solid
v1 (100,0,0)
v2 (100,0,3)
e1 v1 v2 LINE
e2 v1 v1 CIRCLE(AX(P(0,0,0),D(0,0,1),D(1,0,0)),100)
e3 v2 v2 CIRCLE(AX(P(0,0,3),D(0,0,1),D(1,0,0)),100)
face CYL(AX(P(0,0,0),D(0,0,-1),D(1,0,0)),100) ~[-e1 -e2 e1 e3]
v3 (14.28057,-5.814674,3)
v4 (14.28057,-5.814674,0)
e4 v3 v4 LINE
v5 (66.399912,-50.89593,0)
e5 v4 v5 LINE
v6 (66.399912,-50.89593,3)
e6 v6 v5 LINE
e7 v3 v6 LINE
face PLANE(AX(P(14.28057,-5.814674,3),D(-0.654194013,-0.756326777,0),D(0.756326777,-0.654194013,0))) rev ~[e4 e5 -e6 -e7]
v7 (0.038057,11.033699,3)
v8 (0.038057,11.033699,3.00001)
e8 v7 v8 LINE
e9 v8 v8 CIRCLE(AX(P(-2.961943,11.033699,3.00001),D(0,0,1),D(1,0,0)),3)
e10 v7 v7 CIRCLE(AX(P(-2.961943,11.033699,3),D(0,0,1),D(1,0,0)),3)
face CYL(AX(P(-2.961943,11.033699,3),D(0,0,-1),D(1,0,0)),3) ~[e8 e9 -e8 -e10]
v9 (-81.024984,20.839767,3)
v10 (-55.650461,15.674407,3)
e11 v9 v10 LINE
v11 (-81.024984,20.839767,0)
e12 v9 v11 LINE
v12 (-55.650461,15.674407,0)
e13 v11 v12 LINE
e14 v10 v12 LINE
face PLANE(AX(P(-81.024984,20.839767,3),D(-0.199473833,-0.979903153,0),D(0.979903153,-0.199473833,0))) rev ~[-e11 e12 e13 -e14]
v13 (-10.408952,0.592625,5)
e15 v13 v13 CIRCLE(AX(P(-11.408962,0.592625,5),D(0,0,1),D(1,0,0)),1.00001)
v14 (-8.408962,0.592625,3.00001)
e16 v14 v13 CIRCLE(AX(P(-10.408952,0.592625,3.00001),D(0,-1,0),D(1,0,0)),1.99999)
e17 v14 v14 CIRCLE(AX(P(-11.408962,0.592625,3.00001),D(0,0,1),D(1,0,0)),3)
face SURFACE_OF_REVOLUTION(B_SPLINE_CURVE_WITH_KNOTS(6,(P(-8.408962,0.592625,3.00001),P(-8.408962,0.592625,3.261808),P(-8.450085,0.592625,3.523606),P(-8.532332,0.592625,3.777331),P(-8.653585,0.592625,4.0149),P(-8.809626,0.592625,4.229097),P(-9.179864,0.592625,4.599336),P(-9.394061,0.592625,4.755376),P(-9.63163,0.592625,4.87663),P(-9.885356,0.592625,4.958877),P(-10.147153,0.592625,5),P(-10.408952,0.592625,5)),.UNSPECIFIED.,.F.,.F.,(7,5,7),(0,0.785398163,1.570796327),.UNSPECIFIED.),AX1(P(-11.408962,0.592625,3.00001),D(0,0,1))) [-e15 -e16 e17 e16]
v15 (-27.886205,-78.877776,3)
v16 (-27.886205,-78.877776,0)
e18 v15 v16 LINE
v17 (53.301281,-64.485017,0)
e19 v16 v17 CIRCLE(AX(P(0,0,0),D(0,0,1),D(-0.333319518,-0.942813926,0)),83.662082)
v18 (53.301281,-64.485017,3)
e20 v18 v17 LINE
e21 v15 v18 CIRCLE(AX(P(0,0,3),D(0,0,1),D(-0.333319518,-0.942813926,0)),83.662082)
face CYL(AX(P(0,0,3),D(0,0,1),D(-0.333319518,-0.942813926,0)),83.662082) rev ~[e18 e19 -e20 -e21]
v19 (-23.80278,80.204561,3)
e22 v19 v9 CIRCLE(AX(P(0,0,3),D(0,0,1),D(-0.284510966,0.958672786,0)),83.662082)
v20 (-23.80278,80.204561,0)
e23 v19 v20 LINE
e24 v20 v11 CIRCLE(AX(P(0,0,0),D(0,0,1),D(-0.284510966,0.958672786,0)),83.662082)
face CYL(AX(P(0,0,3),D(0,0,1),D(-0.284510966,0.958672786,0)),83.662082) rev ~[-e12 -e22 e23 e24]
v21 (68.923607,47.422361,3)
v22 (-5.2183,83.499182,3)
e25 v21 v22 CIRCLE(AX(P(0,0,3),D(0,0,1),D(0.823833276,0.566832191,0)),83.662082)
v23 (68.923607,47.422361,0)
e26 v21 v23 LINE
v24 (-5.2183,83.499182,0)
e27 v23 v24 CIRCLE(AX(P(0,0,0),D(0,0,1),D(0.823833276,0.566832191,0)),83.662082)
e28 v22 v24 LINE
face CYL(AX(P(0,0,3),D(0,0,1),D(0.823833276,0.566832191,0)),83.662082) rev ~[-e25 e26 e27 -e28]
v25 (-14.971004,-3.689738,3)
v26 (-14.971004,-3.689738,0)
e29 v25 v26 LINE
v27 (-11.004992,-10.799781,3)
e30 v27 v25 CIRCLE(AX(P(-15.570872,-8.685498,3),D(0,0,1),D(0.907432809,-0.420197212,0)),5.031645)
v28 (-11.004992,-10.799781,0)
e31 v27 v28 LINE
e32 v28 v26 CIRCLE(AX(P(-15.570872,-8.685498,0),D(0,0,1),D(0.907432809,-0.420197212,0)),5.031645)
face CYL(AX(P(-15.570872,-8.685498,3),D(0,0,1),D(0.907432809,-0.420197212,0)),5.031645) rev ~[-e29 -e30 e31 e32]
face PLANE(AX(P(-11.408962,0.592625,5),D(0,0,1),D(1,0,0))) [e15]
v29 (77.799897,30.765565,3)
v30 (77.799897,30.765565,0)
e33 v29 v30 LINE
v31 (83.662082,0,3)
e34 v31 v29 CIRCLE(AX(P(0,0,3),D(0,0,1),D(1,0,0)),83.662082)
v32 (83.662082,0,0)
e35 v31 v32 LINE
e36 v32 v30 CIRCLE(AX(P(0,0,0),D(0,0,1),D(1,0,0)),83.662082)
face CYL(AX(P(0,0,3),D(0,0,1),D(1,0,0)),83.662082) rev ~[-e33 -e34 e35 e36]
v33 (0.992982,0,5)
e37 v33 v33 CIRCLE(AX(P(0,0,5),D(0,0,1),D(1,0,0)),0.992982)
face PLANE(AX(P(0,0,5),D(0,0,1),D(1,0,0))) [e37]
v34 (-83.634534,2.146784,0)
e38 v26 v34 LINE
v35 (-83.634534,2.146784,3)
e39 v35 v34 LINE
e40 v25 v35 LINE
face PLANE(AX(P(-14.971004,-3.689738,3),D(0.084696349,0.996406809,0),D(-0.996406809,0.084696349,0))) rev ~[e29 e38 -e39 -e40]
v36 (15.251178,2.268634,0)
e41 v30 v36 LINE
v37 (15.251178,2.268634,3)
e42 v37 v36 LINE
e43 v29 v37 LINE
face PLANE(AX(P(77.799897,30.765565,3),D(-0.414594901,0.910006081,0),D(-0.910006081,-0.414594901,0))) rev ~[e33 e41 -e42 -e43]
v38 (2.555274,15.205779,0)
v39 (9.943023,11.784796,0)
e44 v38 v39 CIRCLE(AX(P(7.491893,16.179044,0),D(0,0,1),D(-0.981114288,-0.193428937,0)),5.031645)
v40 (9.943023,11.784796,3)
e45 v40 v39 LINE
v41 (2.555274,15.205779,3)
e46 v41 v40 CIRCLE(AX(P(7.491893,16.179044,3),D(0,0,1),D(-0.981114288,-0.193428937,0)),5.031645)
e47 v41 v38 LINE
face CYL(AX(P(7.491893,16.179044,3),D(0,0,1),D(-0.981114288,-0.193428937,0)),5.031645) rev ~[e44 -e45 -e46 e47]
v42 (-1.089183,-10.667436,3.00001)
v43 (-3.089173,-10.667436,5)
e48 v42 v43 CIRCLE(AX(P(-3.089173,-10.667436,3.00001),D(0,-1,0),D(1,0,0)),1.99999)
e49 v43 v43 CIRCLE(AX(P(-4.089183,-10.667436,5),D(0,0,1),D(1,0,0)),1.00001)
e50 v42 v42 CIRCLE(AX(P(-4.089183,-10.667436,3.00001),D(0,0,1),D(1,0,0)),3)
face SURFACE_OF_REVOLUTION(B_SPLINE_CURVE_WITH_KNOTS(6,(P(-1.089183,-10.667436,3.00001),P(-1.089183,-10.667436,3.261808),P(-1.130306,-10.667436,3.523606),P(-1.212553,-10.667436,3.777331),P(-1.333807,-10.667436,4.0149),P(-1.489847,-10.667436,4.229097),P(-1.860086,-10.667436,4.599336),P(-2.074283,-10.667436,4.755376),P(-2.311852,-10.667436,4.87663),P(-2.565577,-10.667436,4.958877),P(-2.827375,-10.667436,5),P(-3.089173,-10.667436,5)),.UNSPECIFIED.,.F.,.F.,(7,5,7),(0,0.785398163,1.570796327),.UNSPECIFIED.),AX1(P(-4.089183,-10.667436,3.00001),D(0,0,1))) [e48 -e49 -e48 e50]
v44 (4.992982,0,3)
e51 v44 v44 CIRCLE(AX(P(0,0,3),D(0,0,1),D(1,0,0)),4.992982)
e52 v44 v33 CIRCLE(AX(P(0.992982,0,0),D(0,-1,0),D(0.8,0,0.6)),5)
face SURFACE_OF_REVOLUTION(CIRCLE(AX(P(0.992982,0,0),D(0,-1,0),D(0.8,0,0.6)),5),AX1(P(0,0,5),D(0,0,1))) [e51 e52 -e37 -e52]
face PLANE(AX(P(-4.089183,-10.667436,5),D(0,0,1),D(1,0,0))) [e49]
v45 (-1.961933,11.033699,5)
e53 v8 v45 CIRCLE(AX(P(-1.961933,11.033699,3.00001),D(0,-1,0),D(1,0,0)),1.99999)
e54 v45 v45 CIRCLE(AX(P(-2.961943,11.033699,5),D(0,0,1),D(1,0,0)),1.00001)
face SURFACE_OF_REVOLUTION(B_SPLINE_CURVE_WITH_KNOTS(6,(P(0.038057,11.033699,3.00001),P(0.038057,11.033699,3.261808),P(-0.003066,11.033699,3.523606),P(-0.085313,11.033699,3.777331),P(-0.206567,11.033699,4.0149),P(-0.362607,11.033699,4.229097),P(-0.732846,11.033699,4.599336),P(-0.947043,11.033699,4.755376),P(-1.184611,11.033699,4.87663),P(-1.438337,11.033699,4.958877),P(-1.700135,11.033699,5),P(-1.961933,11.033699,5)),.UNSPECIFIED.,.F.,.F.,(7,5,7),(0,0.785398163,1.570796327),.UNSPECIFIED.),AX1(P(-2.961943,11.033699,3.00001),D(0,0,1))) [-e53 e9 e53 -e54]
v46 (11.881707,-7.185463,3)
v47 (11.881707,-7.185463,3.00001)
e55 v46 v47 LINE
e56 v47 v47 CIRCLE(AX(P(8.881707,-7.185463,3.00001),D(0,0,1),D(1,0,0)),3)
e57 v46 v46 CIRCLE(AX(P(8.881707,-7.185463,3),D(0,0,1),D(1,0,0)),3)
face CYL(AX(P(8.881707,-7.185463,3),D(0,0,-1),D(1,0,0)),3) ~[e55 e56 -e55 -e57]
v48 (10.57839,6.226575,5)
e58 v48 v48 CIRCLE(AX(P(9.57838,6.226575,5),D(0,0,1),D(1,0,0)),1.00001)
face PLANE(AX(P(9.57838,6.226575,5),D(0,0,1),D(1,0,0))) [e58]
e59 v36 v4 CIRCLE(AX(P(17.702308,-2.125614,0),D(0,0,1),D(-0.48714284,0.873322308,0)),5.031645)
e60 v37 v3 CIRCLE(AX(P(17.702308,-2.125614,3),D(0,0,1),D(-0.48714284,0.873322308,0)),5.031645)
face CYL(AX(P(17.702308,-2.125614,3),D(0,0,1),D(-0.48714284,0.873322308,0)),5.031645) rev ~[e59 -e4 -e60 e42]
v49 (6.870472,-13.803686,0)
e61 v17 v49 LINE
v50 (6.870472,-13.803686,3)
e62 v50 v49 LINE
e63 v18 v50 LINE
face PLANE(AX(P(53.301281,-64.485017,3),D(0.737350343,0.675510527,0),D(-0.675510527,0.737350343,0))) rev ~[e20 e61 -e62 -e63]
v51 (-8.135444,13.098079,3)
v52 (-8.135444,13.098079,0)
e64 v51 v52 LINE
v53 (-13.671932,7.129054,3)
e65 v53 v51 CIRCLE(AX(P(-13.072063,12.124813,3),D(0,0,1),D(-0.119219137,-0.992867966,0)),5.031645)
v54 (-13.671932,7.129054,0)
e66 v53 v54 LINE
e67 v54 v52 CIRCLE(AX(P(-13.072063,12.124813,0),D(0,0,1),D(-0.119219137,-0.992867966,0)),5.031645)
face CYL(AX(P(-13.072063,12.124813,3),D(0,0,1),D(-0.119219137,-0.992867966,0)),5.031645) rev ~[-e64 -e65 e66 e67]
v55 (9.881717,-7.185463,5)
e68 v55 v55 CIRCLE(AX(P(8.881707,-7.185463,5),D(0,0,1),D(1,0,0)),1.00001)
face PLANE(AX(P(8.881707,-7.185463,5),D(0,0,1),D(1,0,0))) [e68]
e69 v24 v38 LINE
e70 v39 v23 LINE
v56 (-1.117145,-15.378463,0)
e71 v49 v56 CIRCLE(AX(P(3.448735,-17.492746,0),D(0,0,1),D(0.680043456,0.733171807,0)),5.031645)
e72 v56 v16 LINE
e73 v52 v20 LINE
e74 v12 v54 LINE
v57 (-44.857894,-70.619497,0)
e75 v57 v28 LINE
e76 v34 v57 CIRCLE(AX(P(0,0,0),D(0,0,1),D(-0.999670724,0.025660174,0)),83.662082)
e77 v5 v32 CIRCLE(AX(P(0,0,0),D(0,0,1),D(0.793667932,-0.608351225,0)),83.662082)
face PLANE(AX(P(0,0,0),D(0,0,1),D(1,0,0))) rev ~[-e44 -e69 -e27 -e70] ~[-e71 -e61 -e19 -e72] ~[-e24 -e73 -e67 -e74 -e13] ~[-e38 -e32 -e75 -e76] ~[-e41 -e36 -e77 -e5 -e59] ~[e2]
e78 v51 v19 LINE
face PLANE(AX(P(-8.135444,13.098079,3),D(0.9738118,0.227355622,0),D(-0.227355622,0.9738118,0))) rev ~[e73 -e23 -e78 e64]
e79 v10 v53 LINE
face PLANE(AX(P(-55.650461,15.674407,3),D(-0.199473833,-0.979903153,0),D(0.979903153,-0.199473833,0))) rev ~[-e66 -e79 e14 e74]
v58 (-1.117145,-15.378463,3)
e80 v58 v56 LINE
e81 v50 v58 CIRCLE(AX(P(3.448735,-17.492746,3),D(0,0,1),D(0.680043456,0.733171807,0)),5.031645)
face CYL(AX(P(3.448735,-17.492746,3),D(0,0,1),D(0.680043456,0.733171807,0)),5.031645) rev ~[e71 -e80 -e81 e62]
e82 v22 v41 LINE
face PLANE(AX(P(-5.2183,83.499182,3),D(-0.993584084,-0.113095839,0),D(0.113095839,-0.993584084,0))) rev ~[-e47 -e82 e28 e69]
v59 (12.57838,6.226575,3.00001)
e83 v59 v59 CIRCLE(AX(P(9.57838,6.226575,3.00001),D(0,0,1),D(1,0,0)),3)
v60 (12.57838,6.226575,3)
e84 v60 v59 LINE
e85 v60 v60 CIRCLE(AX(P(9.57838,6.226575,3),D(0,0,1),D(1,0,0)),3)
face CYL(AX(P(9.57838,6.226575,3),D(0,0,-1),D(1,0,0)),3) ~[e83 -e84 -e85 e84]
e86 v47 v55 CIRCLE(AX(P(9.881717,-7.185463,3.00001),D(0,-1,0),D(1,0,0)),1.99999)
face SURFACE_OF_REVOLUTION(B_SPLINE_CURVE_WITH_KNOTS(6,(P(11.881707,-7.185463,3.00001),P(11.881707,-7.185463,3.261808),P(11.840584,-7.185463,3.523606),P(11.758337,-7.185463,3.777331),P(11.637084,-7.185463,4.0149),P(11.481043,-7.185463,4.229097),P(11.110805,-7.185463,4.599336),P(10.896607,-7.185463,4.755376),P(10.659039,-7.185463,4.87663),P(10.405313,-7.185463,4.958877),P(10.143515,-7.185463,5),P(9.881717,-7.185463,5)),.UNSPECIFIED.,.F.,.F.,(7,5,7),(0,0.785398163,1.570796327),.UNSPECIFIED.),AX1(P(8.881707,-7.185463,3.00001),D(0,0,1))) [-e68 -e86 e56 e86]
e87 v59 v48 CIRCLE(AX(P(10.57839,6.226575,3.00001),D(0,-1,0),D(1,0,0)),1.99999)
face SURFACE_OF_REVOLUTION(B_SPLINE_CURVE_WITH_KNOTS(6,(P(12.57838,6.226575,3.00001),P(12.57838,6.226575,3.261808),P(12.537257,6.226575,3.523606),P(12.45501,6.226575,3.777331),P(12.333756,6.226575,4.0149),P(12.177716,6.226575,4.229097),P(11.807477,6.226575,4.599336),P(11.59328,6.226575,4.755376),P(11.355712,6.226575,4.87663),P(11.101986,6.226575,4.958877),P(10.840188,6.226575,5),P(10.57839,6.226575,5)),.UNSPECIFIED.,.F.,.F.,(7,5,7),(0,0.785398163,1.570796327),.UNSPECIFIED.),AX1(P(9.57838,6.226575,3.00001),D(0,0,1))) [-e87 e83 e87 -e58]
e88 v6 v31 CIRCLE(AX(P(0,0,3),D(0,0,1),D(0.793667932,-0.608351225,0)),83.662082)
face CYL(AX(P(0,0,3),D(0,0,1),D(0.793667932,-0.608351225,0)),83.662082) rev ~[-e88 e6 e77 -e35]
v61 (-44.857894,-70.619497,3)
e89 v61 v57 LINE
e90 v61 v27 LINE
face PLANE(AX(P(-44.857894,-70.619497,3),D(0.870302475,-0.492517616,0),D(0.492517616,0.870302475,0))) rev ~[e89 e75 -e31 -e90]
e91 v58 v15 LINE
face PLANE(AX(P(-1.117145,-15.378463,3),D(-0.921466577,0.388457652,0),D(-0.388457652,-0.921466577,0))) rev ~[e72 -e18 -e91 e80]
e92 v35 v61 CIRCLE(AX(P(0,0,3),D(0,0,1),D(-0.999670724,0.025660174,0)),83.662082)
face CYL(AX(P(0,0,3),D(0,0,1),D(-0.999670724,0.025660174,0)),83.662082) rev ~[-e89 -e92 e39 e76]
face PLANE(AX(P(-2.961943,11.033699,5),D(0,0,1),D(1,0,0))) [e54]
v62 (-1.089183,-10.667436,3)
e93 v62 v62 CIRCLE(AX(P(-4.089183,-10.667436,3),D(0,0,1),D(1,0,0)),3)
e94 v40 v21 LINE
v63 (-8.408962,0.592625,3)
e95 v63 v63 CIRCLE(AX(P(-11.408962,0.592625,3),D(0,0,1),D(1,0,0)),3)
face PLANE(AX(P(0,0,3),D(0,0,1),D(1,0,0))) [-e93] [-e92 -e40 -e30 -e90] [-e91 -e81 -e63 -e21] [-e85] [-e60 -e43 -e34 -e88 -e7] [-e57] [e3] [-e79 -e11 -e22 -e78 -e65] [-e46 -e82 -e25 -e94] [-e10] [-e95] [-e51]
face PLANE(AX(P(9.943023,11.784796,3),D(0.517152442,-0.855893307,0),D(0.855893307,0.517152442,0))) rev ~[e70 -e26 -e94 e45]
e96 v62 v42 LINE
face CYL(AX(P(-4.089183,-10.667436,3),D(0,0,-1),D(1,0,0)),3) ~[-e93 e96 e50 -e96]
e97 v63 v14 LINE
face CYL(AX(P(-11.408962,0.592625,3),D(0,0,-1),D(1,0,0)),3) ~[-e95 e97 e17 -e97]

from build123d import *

# Parameters (mm, degrees)
F0_R     = 100
F1_DEPTH = 3
F2_R     = 3
F3_DEPTH = 2
F4_R     = 4.9929816157
F5_DEPTH = 2
F6_R     = 1.99999
F9_DEPTH = 3


# Not quite as in the source:
# - a fillet or chamfer that OpenCascade refuses, or shapes differently, is made with other operations: its cross-section is extruded or revolved along the edge and cut away or added
# - a fillet or chamfer is up to 0.001 mm smaller than in the source, because OpenCascade refuses the exact size


with BuildPart() as f1:
    # F0 (on Top) → F1 (new body)
    with BuildSketch(Plane.XY):
        Circle(F0_R)
    extrude(amount=F1_DEPTH)

    # F2 (on face) → F3 (join)
    with BuildSketch(Plane.XY.offset(3)):
        with Locations((-2.9619428524, 11.0336985157)):
            Circle(F2_R)
        with Locations((9.5783801944, 6.2265754028)):
            Circle(F2_R)
        with Locations((-11.4089615499, 0.5926253015)):
            Circle(F2_R)
        with Locations((-4.0891831618, -10.6674359368)):
            Circle(F2_R)
        with Locations((8.8817073697, -7.1854632832)):
            Circle(F2_R)
    extrude(amount=F3_DEPTH)

    # F4 (on face) → F5 (join)
    with BuildSketch(Plane.XY.offset(3)):
        Circle(F4_R)
    extrude(amount=F5_DEPTH)

    # F6 (radius 2 in the source; OpenCascade refuses exactly that, so slightly less here)
    f6_edges = [f1.edges().sort_by_distance(p)[0] for p in [
        (-5.961943, 11.033699, 5),
        (6.57838, 6.226575, 5),
        (-14.408962, 0.592625, 5),
        (-7.089183, -10.667436, 5),
        (5.881707, -7.185463, 5),
    ]]
    fillet(f6_edges, radius=F6_R)

    # F7: fillet of radius 5 on 1 edges, made by hand

    # F7_s1 → F7_t2 (revolve, cut)
    with BuildSketch(Plane.XZ):
        with BuildLine():
            ThreePointArc((4.9929816157, 3), (3.2290495932, 4.472135955), (0.9929816157, 5))
            Line((0.9929816157, 5), (4.9929816157, 5))
            Line((4.9929816157, 5), (4.9929816157, 3))
        make_face()
    revolve(axis=Axis((0, 0, 5), (0, 0, 1)), mode=Mode.SUBTRACT)

    # F8 (on face) → F9 (cut, through all)
    with BuildSketch(Plane.XY.offset(3)):
        with BuildLine():
            ThreePointArc((66.3999116797, -50.8959301615), (79.2290945271, -26.8718171788), (83.6620820807, 0))
            ThreePointArc((83.6620820807, 0), (82.1834696388, 15.6595432948), (77.7998972031, 30.7655647318))
            Line((77.7998972031, 30.7655647318), (15.2511779268, 2.2686341687))
            Line((15.2511779268, 2.2686341687), (17.7023078517, -2.1256138206))
            Line((17.7023078517, -2.1256138206), (14.2805704694, -5.8146742141))
            Line((14.2805704694, -5.8146742141), (66.3999116797, -50.8959301615))
        make_face()
        with BuildLine():
            Line((9.9430227659, 11.7847964524), (68.923607167, 47.42236132))
            ThreePointArc((68.923607167, 47.42236132), (36.6056794276, 75.2287724991), (-5.2183004193, 83.4991815458))
            Line((-5.2183004193, 83.4991815458), (2.5552738543, 15.2057786606))
            Line((2.5552738543, 15.2057786606), (7.491892841, 16.1790444417))
            Line((7.491892841, 16.1790444417), (9.9430227659, 11.7847964524))
        make_face()
        with BuildLine():
            Line((17.7023078517, -2.1256138206), (15.2511779268, 2.2686341687))
            ThreePointArc((15.2511779268, 2.2686341687), (12.7065485295, -1.5257454222), (14.2805704694, -5.8146742141))
            Line((14.2805704694, -5.8146742141), (17.7023078517, -2.1256138206))
        make_face()
        with BuildLine():
            ThreePointArc((-27.886204899, -78.8777760489), (14.6037462755, -82.3776339354), (53.3012812121, -64.4850168584))
            Line((53.3012812121, -64.4850168584), (6.8704724729, -13.8036856363))
            Line((6.8704724729, -13.8036856363), (3.4487350906, -17.4927460298))
            Line((3.4487350906, -17.4927460298), (-1.1171448371, -15.3784627502))
            Line((-1.1171448371, -15.3784627502), (-27.886204899, -78.8777760489))
        make_face()
        with BuildLine():
            ThreePointArc((2.5552738543, 15.2057786606), (5.3776095614, 11.613164514), (9.9430227659, 11.7847964524))
            Line((9.9430227659, 11.7847964524), (7.491892841, 16.1790444417))
            Line((7.491892841, 16.1790444417), (2.5552738543, 15.2057786606))
        make_face()
        with BuildLine():
            Line((3.4487350906, -17.4927460298), (6.8704724729, -13.8036856363))
            ThreePointArc((6.8704724729, -13.8036856363), (2.4754693095, -12.5561270431), (-1.1171448371, -15.3784627502))
            Line((-1.1171448371, -15.3784627502), (3.4487350906, -17.4927460298))
        make_face()
        with BuildLine():
            Line((-17.7639668564, 54.3390592143), (-23.8027798233, 80.204561284))
            ThreePointArc((-23.8027798233, 80.204561284), (-60.2350372644, 58.0610391212), (-81.0249842257, 20.8397674963))
            Line((-81.0249842257, 20.8397674963), (-55.6504609188, 15.6744066086))
            ThreePointArc((-55.6504609188, 15.6744066086), (-29.7834804383, 28.2223454015), (-17.7639668564, 54.3390592143))
        make_face()
        with BuildLine():
            ThreePointArc((-83.6345341245, 2.1467836063), (-73.8329797706, -39.3450769001), (-44.8578937701, -70.6194969154))
            Line((-44.8578937701, -70.6194969154), (-11.0049924198, -10.799781062))
            Line((-11.0049924198, -10.799781062), (-15.5708723475, -8.6854977824))
            Line((-15.5708723475, -8.6854977824), (-14.971003949, -3.6897384602))
            Line((-14.971003949, -3.6897384602), (-83.6345341245, 2.1467836063))
        make_face()
        with BuildLine():
            Line((-8.1354444491, 13.0980789722), (-17.7639668564, 54.3390592143))
            ThreePointArc((-17.7639668564, 54.3390592143), (-29.7834804383, 28.2223454015), (-55.6504609188, 15.6744066086))
            Line((-55.6504609188, 15.6744066086), (-13.6719318343, 7.1290538689))
            Line((-13.6719318343, 7.1290538689), (-13.0720634358, 12.1248131911))
            Line((-13.0720634358, 12.1248131911), (-8.1354444491, 13.0980789722))
        make_face()
        with BuildLine():
            ThreePointArc((-13.6719318343, 7.1290538689), (-9.3830030423, 8.7030758088), (-8.1354444491, 13.0980789722))
            Line((-8.1354444491, 13.0980789722), (-13.0720634358, 12.1248131911))
            Line((-13.0720634358, 12.1248131911), (-13.6719318343, 7.1290538689))
        make_face()
        with BuildLine():
            Line((-15.5708723475, -8.6854977824), (-11.0049924198, -10.799781062))
            ThreePointArc((-11.0049924198, -10.799781062), (-11.1766243581, -6.2343678575), (-14.971003949, -3.6897384602))
            Line((-14.971003949, -3.6897384602), (-15.5708723475, -8.6854977824))
        make_face()
    extrude(amount=-F9_DEPTH, mode=Mode.SUBTRACT)


solid = f1.part
